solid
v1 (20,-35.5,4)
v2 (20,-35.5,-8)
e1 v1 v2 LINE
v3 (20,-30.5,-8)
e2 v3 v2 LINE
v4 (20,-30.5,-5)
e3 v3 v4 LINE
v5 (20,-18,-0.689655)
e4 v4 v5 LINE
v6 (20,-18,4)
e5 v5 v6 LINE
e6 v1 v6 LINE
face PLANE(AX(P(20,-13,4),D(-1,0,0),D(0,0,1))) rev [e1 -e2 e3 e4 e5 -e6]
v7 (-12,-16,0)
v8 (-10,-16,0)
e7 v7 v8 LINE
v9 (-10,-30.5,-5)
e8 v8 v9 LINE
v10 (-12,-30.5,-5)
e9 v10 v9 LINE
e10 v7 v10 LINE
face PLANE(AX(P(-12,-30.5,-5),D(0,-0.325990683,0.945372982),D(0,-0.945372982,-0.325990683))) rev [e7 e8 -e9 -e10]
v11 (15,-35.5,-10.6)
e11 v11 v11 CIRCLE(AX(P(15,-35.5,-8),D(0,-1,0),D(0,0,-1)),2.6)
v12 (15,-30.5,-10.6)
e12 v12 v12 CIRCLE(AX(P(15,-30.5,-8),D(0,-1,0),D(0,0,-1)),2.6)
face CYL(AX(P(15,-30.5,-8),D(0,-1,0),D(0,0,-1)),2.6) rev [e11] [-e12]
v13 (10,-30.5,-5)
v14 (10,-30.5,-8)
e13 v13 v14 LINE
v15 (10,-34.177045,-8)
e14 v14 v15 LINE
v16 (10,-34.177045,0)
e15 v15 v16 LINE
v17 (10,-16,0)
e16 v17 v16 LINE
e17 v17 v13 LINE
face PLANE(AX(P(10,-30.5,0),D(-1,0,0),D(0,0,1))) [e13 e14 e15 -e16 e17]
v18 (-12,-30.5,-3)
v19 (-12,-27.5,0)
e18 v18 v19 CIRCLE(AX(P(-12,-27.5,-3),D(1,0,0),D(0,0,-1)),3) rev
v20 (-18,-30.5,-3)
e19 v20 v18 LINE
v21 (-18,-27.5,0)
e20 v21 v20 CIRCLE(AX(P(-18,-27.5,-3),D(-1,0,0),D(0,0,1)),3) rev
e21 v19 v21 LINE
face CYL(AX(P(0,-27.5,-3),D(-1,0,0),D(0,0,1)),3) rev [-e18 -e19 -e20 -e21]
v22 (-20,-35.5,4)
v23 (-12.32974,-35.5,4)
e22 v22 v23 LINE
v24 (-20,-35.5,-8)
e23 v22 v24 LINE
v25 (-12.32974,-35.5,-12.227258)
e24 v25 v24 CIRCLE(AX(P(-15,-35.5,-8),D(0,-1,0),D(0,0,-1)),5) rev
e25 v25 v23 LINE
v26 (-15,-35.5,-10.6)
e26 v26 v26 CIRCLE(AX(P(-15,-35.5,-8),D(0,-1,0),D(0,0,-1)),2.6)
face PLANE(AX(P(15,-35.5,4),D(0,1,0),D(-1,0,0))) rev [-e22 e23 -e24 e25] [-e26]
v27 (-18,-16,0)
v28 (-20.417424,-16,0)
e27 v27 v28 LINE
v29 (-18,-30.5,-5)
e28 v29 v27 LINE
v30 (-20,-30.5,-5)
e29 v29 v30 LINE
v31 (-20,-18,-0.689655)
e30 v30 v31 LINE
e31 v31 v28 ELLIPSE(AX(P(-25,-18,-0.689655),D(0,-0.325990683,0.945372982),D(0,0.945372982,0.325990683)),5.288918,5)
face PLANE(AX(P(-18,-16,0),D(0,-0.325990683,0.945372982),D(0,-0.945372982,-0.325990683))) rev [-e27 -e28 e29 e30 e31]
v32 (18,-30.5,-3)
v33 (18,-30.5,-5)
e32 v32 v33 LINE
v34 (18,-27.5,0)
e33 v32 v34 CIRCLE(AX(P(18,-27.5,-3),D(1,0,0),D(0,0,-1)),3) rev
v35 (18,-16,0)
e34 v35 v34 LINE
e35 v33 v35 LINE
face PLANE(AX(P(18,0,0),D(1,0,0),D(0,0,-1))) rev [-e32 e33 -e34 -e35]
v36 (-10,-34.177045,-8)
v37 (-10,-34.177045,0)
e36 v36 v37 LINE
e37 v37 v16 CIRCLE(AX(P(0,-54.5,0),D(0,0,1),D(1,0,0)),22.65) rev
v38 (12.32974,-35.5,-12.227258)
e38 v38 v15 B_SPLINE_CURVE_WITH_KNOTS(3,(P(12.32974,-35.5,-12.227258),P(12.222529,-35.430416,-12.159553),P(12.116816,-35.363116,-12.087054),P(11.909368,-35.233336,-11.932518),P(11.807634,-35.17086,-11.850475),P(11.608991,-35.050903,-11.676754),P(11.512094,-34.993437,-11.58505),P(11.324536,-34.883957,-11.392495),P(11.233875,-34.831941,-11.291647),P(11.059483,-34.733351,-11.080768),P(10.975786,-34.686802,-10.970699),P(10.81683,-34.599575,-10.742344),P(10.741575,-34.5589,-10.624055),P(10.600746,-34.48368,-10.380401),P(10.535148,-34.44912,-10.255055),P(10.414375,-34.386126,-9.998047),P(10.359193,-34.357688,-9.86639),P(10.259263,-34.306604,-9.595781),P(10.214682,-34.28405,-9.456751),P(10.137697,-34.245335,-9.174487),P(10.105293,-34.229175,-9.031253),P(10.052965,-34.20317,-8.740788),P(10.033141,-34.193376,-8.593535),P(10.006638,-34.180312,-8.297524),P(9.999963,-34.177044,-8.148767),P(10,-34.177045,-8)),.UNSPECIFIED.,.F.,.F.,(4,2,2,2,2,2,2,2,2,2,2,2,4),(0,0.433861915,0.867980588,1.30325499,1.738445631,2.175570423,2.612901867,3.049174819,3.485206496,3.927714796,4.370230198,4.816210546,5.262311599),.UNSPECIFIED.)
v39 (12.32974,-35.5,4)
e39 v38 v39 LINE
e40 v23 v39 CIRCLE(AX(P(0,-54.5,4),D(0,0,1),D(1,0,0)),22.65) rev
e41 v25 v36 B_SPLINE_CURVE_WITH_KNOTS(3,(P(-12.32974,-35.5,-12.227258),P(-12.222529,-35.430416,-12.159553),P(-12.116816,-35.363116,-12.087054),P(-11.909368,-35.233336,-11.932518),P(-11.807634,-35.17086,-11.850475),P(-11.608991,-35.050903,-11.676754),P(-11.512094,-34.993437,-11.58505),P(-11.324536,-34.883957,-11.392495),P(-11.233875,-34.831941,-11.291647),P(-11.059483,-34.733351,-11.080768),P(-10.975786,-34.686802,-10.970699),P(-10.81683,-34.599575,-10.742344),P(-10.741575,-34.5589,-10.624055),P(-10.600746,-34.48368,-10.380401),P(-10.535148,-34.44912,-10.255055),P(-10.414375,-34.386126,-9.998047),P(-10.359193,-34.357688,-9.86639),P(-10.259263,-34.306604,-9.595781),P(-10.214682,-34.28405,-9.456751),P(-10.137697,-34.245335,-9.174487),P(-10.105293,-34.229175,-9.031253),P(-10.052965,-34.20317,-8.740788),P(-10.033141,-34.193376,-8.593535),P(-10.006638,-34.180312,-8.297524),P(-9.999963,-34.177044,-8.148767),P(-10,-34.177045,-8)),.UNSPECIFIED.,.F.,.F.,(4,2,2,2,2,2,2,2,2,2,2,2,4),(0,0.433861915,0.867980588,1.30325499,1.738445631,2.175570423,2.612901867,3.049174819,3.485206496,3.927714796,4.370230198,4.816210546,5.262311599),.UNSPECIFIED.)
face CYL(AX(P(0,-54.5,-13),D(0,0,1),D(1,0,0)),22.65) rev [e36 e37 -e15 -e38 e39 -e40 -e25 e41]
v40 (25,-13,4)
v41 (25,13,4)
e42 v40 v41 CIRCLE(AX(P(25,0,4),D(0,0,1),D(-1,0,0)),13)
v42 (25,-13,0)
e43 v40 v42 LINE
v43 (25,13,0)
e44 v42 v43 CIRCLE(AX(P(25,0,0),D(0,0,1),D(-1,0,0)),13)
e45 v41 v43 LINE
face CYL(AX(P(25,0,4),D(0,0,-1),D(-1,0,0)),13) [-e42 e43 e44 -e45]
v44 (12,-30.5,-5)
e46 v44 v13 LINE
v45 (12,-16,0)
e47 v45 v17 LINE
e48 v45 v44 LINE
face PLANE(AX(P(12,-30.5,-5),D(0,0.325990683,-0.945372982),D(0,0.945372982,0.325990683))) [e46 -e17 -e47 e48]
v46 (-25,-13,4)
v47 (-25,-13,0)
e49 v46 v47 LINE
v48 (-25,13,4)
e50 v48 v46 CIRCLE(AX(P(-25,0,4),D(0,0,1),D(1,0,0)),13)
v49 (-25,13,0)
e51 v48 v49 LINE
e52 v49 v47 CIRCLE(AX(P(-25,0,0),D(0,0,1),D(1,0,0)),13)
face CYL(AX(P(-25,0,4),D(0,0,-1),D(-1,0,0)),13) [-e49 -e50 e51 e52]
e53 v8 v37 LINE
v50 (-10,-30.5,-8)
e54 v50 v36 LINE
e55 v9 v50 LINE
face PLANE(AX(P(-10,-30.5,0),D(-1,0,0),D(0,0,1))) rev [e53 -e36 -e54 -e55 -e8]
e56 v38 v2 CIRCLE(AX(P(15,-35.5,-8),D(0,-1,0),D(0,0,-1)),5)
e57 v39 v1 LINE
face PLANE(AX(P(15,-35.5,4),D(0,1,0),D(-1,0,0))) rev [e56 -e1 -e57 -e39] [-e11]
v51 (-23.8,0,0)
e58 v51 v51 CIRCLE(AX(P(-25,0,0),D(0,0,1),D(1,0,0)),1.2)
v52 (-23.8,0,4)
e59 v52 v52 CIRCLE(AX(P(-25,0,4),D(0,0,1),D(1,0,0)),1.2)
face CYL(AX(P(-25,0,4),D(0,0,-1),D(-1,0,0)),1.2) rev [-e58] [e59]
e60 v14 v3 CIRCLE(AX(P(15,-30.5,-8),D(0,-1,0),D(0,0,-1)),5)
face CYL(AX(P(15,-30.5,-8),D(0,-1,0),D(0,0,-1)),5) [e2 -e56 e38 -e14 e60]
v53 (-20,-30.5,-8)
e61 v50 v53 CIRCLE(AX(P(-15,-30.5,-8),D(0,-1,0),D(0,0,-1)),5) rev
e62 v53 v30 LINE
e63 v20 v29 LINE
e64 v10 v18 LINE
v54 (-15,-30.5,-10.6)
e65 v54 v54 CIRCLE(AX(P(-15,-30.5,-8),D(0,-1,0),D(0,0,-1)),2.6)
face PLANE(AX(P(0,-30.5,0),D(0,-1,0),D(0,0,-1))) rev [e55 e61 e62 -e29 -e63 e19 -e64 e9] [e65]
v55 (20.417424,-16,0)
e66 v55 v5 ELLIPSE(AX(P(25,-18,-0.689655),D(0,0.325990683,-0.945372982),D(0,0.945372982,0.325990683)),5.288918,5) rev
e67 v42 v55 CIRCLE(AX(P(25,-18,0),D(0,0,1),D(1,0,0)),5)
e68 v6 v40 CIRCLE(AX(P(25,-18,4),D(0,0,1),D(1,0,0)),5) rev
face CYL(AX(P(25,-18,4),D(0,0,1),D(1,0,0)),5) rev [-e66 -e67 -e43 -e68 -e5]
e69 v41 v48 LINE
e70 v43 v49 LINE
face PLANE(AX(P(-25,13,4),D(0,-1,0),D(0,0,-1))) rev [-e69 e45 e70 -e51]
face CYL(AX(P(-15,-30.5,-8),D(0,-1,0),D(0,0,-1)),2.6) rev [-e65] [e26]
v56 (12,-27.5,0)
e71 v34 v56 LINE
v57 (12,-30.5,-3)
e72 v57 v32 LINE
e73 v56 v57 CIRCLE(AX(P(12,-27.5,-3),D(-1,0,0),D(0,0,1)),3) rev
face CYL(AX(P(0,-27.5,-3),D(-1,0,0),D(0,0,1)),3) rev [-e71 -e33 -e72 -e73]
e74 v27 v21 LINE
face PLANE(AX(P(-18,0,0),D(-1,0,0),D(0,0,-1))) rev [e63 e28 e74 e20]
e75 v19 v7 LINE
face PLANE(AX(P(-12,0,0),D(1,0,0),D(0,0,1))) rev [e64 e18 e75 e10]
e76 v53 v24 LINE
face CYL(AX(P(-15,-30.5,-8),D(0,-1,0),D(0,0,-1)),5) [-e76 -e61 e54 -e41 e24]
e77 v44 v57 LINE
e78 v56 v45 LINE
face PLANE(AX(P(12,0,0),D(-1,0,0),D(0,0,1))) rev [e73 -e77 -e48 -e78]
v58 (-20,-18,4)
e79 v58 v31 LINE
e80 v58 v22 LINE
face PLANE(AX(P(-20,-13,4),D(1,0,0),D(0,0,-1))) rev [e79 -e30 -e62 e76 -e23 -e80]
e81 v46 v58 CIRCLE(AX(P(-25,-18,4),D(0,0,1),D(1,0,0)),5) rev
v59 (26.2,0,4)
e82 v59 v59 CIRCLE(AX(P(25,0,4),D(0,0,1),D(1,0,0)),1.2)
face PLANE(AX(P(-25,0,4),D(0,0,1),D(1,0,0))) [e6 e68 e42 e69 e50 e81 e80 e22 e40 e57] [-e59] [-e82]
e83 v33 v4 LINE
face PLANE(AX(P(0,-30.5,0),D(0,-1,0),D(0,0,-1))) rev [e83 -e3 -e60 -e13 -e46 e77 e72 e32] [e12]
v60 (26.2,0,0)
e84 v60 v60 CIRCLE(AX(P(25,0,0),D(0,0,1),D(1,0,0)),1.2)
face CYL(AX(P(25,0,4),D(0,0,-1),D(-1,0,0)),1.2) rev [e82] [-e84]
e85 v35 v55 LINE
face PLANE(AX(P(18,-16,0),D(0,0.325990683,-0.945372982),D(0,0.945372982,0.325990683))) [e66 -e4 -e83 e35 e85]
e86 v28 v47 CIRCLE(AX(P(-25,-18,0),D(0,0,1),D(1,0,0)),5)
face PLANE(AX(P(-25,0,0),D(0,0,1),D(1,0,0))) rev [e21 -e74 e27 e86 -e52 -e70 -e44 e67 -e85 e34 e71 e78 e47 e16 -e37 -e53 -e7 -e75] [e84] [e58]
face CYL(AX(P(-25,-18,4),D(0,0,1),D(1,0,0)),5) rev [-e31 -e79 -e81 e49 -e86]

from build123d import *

# Parameters (mm, degrees)
EXTRUDE_1_OUTLINE_R             = 1.2
EXTRUDE_1_DEPTH                 = 4
SKETCH_2_R                      = 2.6
EXTRUDE_2_DEPTH                 = 5
CUT_EXTRUDE_1_REACH             = 55.603
CUT_EXTRUDE_1_DIRECTION_2_DEPTH = 54.602705156
EXTRUDE_4_DEPTH                 = 2
EXTRUDE_5_DEPTH                 = 2
FILLET_1_R                      = 3
FILLET_2_R                      = 5


# Read off the part's stored shape, not the designer's step: 凸台-拉伸1
with BuildPart() as part:
    # 凸台-拉伸1 outline → 凸台-拉伸1 (new body)
    with BuildSketch(Plane.XY):
        with BuildLine():
            ThreePointArc((-25, 13), (-38, 0), (-25, -13))
            Line((-25, -13), (-20, -13))
            Line((-20, -13), (-20, -35.5))
            Line((-20, -35.5), (20, -35.5))
            Line((20, -35.5), (20, -13))
            Line((20, -13), (25, -13))
            ThreePointArc((25, -13), (38, 0), (25, 13))
            Line((25, 13), (-25, 13))
        make_face()
        with Locations((-25, 0)):
            Circle(EXTRUDE_1_OUTLINE_R, mode=Mode.SUBTRACT)
        with Locations((25, 0)):
            Circle(EXTRUDE_1_OUTLINE_R, mode=Mode.SUBTRACT)
    extrude(amount=EXTRUDE_1_DEPTH)

    # 草图2 → 凸台-拉伸2 (add)
    # profile 1 of 2: a face of its own
    with BuildSketch(Plane.XZ.offset(35.5)):
        with BuildLine():
            Line((-20, -8), (-20, 0))
            Line((-20, 0), (-20, 4))
            Line((-20, 4), (-10, 4))
            Line((-10, 4), (-10, 0))
            Line((-10, 0), (-10, -8))
            ThreePointArc((-10, -8), (-15, -13), (-20, -8))
        make_face()
        with Locations(Location((-15, -8, 0), (0, 0, 270))):
            Circle(SKETCH_2_R, mode=Mode.SUBTRACT)
    # profile 2 of 2: a face of its own
    with BuildSketch(Plane.XZ.offset(35.5)):
        with BuildLine():
            Line((20, 0), (20, 4))
            Line((20, 4), (10, 4))
            Line((10, 4), (10, 0))
            Line((10, 0), (10, -8))
            ThreePointArc((10, -8), (15, -13), (20, -8))
            Line((20, -8), (20, 0))
        make_face()
        with Locations(Location((15, -8, 0), (0, 0, 270))):
            Circle(SKETCH_2_R, mode=Mode.SUBTRACT)
    extrude(amount=-EXTRUDE_2_DEPTH)

    # 草图3 → 切除-拉伸1 (cut, up to next)
    with BuildSketch(Plane(origin=(0, 0, 0), x_dir=(-1, 0, 0), z_dir=(0, 0, -1)), mode=Mode.PRIVATE) as cut_extrude_1_sk1:
        with BuildLine():
            Line((-12.329740468, -35.5), (12.329740468, -35.5))
            ThreePointArc((12.329740468, -35.5), (0, -31.85), (-12.329740468, -35.5))
        make_face()
    cut_extrude_1_tool1 = extrude(cut_extrude_1_sk1.sketch, amount=-CUT_EXTRUDE_1_REACH, mode=Mode.PRIVATE) & part.part
    add(cut_extrude_1_tool1.solids().sort_by_distance((0, -34.029422, 0))[0], mode=Mode.SUBTRACT)

    # 草图3 → 切除-拉伸1 direction 2 (cut)
    with BuildSketch(Plane(origin=(0, 0, 0), x_dir=(-1, 0, 0), z_dir=(0, 0, -1))):
        with BuildLine():
            Line((-12.329740468, -35.5), (12.329740468, -35.5))
            ThreePointArc((12.329740468, -35.5), (0, -31.85), (-12.329740468, -35.5))
        make_face()
    extrude(amount=CUT_EXTRUDE_1_DIRECTION_2_DEPTH, mode=Mode.SUBTRACT)

    # 草图5 → 凸台-拉伸4 (add)
    with BuildSketch(Plane(origin=(20, 0, 0), x_dir=(0, 0, -1), z_dir=(1, 0, 0))):
        Polygon((0, -16), (5, -30.5), (0, -30.5), align=None)
    extrude_4 = extrude(amount=-EXTRUDE_4_DEPTH)

    # 草图6 → 凸台-拉伸5 (add)
    with BuildSketch(Plane.ZY.offset(-10)):
        Polygon((-5, -30.5), (0, -16), (0, -30.5), align=None)
    extrude_5 = extrude(amount=-EXTRUDE_5_DEPTH)

    # 镜向1: 凸台-拉伸4, 凸台-拉伸5 across plane
    add(extrude_4.mirror(Plane(origin=(0, 0, 0), x_dir=(0, 0, 1), z_dir=(1, 0, 0))))
    add(extrude_5.mirror(Plane(origin=(0, 0, 0), x_dir=(0, 0, 1), z_dir=(1, 0, 0))))

    # 圆角1
    fillet_1_edges = [part.edges().sort_by_distance(p)[0] for p in [
        (15, -30.5, 0),
        (-15, -30.5, 0),
    ]]
    fillet(fillet_1_edges, radius=FILLET_1_R)

    # 圆角2
    fillet_2_edges = [part.edges().sort_by_distance(p)[0] for p in [
        (-20, -13, 2),
        (20, -13, 2),
    ]]
    fillet(fillet_2_edges, radius=FILLET_2_R - 0.0001)  # a hair under: the kernel refuses the full size


solid = part.part
